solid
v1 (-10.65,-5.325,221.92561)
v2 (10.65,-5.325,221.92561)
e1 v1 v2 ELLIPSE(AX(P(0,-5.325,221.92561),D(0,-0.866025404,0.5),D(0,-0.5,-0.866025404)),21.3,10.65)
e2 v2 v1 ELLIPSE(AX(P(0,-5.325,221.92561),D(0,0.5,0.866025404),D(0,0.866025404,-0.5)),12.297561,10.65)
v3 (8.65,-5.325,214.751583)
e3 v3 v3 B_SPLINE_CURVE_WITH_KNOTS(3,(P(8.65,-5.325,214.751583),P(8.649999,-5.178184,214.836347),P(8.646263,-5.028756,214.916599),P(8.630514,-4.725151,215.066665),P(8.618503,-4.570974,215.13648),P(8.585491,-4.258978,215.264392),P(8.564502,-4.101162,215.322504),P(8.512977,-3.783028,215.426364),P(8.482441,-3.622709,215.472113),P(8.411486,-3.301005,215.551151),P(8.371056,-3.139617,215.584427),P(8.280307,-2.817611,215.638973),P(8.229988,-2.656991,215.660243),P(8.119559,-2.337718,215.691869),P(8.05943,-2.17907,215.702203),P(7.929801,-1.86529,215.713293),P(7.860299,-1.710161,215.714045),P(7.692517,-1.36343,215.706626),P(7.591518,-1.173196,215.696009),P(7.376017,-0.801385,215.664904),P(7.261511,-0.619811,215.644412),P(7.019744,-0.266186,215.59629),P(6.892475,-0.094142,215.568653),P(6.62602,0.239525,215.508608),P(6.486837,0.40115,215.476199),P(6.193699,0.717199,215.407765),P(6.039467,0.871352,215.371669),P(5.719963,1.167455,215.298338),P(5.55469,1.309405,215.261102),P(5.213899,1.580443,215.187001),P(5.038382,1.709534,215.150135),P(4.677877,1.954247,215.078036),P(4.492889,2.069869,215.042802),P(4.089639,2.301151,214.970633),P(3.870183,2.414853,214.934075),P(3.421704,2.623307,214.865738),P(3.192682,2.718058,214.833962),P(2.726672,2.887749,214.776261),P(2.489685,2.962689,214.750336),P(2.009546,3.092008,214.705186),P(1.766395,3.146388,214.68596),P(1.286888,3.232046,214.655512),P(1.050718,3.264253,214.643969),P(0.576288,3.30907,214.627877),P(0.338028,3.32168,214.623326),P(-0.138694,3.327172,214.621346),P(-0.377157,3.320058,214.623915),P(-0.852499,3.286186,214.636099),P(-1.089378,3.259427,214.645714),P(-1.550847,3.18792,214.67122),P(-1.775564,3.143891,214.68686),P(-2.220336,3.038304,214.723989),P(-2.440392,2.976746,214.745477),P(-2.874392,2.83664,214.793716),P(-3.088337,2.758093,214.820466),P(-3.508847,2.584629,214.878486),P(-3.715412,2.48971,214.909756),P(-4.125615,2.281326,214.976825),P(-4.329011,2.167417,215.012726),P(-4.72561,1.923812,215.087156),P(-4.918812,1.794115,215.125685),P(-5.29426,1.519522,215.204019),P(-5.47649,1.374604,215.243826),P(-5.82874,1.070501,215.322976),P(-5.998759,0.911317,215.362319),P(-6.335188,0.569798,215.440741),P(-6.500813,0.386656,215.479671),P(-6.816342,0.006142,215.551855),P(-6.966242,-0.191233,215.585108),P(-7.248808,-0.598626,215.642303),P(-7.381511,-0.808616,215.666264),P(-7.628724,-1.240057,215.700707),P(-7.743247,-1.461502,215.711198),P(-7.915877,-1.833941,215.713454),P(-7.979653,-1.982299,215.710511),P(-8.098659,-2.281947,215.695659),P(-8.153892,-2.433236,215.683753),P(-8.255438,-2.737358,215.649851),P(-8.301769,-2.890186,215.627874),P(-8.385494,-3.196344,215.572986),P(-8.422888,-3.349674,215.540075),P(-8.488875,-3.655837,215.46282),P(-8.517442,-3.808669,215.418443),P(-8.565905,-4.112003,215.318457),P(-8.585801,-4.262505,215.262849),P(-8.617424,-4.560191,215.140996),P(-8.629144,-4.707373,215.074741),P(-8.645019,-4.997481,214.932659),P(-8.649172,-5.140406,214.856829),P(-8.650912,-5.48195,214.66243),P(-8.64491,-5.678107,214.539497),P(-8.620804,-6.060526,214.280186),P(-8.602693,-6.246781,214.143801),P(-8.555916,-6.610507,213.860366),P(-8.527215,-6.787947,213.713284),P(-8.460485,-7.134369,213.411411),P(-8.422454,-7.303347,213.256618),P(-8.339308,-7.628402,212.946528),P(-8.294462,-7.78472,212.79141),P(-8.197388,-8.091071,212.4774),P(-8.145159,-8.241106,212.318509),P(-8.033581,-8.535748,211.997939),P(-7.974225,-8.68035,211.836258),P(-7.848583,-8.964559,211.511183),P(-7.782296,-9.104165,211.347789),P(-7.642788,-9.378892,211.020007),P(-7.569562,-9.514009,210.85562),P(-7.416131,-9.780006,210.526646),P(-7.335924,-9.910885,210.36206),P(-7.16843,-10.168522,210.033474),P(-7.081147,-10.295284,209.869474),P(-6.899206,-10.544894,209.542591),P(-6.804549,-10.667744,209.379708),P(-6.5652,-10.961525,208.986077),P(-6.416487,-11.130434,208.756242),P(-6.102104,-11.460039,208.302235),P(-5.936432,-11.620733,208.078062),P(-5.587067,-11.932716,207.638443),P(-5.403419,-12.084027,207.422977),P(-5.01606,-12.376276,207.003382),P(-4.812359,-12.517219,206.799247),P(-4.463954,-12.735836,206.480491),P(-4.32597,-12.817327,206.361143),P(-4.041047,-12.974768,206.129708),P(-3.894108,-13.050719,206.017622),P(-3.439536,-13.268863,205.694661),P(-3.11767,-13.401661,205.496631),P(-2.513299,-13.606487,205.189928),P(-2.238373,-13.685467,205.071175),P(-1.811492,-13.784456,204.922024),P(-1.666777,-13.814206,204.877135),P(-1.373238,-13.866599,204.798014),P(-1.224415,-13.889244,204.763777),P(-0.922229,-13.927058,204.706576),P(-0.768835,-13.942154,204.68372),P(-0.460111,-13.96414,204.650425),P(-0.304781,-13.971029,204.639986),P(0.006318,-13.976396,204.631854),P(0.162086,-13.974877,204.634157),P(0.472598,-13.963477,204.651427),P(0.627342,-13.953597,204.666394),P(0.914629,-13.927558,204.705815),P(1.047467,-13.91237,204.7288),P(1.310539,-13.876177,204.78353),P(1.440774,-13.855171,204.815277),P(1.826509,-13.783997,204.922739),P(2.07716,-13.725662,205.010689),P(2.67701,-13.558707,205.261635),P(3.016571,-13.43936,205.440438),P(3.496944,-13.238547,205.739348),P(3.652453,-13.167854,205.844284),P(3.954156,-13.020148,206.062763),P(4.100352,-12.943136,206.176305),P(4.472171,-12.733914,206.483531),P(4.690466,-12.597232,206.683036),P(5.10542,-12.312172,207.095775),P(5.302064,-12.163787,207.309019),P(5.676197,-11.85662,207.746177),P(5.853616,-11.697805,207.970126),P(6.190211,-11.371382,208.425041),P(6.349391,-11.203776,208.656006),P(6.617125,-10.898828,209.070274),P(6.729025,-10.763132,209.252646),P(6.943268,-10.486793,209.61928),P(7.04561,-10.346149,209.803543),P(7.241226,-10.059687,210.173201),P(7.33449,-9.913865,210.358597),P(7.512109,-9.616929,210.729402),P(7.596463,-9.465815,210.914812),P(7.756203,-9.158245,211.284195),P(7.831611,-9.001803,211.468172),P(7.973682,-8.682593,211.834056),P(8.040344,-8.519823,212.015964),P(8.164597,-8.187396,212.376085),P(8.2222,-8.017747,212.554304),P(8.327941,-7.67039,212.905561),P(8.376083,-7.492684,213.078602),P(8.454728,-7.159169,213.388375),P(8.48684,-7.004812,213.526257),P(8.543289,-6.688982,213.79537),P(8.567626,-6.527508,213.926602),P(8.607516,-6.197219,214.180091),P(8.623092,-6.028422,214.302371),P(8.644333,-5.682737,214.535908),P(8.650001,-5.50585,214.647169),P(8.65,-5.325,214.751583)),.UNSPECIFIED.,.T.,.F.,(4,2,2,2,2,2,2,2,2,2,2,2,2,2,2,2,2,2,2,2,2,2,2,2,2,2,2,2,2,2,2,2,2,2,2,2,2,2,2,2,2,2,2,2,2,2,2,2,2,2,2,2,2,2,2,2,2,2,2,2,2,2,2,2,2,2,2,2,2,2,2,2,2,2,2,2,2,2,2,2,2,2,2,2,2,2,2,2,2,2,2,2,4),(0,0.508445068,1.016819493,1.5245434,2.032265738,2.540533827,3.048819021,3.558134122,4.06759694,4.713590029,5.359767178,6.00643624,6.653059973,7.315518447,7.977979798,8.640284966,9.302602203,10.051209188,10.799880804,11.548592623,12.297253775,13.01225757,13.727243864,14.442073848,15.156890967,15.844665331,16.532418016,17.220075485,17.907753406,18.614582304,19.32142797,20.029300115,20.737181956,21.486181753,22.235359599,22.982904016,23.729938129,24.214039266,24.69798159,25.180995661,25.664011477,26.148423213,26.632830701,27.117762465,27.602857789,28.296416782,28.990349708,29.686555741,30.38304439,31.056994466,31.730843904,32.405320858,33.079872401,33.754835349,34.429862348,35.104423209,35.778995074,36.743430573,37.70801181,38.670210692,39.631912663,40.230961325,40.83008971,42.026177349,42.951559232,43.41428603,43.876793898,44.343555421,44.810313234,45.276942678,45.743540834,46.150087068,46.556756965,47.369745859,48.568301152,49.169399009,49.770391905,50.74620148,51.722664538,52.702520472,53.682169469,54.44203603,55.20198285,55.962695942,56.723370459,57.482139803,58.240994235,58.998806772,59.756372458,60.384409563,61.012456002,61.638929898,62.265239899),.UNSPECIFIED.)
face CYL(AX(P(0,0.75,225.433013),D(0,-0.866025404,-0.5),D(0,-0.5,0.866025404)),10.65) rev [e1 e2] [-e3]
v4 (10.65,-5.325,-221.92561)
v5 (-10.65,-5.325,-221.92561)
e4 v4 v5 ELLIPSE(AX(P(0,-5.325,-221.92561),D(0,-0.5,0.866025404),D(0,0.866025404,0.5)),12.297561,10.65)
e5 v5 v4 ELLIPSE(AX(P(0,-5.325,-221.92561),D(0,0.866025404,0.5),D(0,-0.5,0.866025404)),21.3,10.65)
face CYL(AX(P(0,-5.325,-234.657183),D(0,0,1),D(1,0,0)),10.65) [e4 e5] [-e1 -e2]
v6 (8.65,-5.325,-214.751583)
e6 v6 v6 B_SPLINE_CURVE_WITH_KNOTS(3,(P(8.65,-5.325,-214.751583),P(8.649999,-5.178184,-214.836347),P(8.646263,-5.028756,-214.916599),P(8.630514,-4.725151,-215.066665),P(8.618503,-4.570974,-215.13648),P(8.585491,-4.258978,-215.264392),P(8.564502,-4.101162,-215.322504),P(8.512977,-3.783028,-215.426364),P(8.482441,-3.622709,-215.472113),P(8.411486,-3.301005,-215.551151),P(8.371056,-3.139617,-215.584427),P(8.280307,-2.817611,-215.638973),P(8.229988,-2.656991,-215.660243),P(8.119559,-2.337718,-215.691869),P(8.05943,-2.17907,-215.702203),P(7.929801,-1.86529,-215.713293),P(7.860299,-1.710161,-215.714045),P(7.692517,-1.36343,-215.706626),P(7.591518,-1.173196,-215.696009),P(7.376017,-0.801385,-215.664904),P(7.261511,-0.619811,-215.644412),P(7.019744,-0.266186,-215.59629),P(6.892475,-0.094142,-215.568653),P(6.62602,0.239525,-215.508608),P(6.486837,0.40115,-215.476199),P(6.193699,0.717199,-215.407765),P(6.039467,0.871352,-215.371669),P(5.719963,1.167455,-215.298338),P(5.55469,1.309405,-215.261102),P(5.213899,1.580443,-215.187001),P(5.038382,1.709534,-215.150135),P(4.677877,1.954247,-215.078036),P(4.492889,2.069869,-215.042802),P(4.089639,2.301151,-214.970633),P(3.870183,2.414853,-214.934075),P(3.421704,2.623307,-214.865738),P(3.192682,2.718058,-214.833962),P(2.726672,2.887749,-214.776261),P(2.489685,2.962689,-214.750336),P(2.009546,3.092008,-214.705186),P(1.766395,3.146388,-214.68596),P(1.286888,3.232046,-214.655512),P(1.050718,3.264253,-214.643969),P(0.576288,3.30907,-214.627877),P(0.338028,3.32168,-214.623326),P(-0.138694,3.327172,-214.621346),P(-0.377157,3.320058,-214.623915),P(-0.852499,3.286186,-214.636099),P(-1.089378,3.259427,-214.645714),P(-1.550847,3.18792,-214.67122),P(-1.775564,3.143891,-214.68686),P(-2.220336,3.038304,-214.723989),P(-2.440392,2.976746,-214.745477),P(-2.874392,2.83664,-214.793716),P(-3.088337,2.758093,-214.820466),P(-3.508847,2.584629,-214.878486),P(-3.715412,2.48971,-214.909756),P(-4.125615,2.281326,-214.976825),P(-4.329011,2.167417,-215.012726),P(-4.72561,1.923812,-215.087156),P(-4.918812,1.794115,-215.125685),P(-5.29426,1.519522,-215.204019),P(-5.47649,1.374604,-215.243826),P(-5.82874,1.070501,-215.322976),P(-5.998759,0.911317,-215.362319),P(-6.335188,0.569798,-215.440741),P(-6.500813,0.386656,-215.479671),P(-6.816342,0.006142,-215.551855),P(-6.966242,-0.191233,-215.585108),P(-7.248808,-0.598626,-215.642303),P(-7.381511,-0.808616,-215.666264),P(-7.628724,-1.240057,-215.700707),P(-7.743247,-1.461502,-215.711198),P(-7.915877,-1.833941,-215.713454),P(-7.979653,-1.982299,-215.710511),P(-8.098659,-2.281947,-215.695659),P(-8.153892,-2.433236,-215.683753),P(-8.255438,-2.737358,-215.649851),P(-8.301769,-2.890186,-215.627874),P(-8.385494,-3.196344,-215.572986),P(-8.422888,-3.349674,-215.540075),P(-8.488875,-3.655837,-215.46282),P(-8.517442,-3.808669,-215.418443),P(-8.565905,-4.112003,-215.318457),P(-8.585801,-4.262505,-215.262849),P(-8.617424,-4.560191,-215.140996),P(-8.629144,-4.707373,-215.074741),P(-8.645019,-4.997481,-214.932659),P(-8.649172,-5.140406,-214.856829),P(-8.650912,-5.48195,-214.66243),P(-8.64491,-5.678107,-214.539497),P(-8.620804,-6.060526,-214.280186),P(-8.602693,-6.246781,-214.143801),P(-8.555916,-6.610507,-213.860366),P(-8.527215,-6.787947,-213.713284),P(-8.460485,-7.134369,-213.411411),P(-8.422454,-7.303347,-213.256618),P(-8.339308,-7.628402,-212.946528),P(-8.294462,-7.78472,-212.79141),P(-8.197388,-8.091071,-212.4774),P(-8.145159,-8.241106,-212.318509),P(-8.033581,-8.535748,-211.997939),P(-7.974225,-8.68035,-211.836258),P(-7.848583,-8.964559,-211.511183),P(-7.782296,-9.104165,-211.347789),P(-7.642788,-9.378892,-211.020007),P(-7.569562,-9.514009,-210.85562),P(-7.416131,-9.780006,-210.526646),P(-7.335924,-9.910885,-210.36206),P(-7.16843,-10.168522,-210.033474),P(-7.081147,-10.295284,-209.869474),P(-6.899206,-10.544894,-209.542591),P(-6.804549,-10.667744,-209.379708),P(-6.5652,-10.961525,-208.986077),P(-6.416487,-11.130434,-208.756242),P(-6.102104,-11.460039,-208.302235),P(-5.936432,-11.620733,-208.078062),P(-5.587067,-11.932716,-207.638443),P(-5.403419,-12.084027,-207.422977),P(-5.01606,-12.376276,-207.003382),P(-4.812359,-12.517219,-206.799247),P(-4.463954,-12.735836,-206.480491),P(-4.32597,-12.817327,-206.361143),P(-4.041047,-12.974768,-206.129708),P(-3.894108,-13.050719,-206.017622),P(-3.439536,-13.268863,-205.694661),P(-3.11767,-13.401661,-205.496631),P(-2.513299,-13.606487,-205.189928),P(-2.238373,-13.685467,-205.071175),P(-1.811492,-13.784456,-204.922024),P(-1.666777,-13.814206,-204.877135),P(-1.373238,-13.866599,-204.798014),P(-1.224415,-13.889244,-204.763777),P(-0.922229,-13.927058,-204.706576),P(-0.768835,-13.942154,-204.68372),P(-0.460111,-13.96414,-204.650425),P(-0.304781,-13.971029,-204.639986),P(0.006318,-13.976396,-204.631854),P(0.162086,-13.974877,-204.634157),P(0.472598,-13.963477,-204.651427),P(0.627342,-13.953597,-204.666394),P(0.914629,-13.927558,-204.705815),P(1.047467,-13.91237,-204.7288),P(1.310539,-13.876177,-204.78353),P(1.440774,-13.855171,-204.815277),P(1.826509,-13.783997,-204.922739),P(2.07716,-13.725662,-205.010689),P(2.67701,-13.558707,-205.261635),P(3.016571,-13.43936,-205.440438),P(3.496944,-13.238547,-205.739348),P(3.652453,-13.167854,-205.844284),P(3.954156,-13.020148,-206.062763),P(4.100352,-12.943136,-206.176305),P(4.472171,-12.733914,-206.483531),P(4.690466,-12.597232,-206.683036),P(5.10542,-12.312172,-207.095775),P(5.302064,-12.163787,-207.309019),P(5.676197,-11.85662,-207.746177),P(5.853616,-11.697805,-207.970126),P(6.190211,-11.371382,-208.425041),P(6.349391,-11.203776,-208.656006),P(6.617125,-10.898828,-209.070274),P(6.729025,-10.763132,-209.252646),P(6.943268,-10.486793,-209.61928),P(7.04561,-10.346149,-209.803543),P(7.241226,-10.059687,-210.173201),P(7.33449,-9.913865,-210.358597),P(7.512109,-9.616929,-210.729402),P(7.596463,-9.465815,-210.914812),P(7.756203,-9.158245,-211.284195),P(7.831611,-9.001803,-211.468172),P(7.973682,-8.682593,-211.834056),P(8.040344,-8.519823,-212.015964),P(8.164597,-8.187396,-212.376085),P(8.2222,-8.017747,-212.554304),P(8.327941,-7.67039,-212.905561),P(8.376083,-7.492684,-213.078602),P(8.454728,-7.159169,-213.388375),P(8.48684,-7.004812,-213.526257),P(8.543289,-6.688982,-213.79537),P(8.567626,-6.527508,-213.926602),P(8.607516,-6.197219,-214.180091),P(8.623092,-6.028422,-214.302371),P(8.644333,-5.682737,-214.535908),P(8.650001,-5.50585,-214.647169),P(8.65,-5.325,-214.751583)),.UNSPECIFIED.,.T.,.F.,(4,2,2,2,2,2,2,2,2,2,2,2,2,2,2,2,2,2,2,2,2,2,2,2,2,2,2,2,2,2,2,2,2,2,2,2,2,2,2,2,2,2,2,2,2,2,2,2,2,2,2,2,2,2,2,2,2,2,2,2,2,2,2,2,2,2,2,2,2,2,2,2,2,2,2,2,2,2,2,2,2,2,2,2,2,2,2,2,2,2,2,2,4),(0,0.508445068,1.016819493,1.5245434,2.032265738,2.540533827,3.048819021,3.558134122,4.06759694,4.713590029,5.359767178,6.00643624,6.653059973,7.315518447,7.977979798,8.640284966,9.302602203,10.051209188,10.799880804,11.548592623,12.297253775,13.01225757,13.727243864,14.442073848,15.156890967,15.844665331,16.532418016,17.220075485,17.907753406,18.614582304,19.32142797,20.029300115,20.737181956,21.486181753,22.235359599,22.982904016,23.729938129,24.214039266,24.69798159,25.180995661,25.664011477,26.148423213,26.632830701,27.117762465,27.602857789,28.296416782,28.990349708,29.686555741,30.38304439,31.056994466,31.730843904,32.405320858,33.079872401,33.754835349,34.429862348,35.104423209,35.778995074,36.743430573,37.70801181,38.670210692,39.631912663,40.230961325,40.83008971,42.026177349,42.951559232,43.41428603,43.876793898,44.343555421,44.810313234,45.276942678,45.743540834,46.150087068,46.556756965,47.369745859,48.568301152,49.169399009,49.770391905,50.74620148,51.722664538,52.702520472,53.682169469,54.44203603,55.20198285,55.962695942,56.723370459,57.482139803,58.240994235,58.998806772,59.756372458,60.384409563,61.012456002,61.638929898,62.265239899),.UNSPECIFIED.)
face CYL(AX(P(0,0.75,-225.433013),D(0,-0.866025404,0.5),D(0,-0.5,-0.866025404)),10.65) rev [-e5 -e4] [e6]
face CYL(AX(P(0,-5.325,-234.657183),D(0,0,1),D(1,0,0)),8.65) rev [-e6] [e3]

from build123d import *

# Parameters (mm, degrees)
EXTRUDE_START         = -221.925609917
EXTRUDE_1_OUTLINE_R   = 10.65
EXTRUDE_1_OUTLINE_R_2 = 8.65
EXTRUDE_1_DEPTH       = 221.925609917
EXTRUDE_START_2       = 87
EXTRUDE_1_2_DEPTH     = 30


with BuildPart() as part:
    # Бобышка-Вытянуть1: read off the stored shape, not the designer's step
    # Бобышка-Вытянуть1 outline → Бобышка-Вытянуть1 (new body)
    with BuildSketch(Plane.XY.offset(EXTRUDE_START)):
        with Locations((0, -5.325)):
            Circle(EXTRUDE_1_OUTLINE_R)
        with Locations((0, -5.325)):
            Circle(EXTRUDE_1_OUTLINE_R_2, mode=Mode.SUBTRACT)
    extrude(amount=EXTRUDE_1_DEPTH)

    # Extrude 1 2 outline → Extrude 1 2 (cut)
    with BuildSketch(Plane(origin=(0, 0, 0), x_dir=(1, 0, 0), z_dir=(0, 0.8660254037845095, -0.4999999999998773)).offset(EXTRUDE_START_2)):
        with BuildLine():
            ThreePointArc((-10.65, 194.855715851), (0, 184.205715851), (10.65, 194.855715851))
            Line((10.65, 194.855715851), (10.65, 202))
            Line((10.65, 202), (-10.65, 202))
            Line((-10.65, 202), (-10.65, 194.855715851))
        make_face()
    extrude(amount=EXTRUDE_1_2_DEPTH, mode=Mode.SUBTRACT)

    # Зеркальное отражение1: part across plane


with BuildPart() as part_1:
    add(part.part)
    add(part.part.mirror(Plane(origin=(0, -5.325, 0), x_dir=(1, 0, 0), z_dir=(0, 0, 1))))


solid = part_1.part
